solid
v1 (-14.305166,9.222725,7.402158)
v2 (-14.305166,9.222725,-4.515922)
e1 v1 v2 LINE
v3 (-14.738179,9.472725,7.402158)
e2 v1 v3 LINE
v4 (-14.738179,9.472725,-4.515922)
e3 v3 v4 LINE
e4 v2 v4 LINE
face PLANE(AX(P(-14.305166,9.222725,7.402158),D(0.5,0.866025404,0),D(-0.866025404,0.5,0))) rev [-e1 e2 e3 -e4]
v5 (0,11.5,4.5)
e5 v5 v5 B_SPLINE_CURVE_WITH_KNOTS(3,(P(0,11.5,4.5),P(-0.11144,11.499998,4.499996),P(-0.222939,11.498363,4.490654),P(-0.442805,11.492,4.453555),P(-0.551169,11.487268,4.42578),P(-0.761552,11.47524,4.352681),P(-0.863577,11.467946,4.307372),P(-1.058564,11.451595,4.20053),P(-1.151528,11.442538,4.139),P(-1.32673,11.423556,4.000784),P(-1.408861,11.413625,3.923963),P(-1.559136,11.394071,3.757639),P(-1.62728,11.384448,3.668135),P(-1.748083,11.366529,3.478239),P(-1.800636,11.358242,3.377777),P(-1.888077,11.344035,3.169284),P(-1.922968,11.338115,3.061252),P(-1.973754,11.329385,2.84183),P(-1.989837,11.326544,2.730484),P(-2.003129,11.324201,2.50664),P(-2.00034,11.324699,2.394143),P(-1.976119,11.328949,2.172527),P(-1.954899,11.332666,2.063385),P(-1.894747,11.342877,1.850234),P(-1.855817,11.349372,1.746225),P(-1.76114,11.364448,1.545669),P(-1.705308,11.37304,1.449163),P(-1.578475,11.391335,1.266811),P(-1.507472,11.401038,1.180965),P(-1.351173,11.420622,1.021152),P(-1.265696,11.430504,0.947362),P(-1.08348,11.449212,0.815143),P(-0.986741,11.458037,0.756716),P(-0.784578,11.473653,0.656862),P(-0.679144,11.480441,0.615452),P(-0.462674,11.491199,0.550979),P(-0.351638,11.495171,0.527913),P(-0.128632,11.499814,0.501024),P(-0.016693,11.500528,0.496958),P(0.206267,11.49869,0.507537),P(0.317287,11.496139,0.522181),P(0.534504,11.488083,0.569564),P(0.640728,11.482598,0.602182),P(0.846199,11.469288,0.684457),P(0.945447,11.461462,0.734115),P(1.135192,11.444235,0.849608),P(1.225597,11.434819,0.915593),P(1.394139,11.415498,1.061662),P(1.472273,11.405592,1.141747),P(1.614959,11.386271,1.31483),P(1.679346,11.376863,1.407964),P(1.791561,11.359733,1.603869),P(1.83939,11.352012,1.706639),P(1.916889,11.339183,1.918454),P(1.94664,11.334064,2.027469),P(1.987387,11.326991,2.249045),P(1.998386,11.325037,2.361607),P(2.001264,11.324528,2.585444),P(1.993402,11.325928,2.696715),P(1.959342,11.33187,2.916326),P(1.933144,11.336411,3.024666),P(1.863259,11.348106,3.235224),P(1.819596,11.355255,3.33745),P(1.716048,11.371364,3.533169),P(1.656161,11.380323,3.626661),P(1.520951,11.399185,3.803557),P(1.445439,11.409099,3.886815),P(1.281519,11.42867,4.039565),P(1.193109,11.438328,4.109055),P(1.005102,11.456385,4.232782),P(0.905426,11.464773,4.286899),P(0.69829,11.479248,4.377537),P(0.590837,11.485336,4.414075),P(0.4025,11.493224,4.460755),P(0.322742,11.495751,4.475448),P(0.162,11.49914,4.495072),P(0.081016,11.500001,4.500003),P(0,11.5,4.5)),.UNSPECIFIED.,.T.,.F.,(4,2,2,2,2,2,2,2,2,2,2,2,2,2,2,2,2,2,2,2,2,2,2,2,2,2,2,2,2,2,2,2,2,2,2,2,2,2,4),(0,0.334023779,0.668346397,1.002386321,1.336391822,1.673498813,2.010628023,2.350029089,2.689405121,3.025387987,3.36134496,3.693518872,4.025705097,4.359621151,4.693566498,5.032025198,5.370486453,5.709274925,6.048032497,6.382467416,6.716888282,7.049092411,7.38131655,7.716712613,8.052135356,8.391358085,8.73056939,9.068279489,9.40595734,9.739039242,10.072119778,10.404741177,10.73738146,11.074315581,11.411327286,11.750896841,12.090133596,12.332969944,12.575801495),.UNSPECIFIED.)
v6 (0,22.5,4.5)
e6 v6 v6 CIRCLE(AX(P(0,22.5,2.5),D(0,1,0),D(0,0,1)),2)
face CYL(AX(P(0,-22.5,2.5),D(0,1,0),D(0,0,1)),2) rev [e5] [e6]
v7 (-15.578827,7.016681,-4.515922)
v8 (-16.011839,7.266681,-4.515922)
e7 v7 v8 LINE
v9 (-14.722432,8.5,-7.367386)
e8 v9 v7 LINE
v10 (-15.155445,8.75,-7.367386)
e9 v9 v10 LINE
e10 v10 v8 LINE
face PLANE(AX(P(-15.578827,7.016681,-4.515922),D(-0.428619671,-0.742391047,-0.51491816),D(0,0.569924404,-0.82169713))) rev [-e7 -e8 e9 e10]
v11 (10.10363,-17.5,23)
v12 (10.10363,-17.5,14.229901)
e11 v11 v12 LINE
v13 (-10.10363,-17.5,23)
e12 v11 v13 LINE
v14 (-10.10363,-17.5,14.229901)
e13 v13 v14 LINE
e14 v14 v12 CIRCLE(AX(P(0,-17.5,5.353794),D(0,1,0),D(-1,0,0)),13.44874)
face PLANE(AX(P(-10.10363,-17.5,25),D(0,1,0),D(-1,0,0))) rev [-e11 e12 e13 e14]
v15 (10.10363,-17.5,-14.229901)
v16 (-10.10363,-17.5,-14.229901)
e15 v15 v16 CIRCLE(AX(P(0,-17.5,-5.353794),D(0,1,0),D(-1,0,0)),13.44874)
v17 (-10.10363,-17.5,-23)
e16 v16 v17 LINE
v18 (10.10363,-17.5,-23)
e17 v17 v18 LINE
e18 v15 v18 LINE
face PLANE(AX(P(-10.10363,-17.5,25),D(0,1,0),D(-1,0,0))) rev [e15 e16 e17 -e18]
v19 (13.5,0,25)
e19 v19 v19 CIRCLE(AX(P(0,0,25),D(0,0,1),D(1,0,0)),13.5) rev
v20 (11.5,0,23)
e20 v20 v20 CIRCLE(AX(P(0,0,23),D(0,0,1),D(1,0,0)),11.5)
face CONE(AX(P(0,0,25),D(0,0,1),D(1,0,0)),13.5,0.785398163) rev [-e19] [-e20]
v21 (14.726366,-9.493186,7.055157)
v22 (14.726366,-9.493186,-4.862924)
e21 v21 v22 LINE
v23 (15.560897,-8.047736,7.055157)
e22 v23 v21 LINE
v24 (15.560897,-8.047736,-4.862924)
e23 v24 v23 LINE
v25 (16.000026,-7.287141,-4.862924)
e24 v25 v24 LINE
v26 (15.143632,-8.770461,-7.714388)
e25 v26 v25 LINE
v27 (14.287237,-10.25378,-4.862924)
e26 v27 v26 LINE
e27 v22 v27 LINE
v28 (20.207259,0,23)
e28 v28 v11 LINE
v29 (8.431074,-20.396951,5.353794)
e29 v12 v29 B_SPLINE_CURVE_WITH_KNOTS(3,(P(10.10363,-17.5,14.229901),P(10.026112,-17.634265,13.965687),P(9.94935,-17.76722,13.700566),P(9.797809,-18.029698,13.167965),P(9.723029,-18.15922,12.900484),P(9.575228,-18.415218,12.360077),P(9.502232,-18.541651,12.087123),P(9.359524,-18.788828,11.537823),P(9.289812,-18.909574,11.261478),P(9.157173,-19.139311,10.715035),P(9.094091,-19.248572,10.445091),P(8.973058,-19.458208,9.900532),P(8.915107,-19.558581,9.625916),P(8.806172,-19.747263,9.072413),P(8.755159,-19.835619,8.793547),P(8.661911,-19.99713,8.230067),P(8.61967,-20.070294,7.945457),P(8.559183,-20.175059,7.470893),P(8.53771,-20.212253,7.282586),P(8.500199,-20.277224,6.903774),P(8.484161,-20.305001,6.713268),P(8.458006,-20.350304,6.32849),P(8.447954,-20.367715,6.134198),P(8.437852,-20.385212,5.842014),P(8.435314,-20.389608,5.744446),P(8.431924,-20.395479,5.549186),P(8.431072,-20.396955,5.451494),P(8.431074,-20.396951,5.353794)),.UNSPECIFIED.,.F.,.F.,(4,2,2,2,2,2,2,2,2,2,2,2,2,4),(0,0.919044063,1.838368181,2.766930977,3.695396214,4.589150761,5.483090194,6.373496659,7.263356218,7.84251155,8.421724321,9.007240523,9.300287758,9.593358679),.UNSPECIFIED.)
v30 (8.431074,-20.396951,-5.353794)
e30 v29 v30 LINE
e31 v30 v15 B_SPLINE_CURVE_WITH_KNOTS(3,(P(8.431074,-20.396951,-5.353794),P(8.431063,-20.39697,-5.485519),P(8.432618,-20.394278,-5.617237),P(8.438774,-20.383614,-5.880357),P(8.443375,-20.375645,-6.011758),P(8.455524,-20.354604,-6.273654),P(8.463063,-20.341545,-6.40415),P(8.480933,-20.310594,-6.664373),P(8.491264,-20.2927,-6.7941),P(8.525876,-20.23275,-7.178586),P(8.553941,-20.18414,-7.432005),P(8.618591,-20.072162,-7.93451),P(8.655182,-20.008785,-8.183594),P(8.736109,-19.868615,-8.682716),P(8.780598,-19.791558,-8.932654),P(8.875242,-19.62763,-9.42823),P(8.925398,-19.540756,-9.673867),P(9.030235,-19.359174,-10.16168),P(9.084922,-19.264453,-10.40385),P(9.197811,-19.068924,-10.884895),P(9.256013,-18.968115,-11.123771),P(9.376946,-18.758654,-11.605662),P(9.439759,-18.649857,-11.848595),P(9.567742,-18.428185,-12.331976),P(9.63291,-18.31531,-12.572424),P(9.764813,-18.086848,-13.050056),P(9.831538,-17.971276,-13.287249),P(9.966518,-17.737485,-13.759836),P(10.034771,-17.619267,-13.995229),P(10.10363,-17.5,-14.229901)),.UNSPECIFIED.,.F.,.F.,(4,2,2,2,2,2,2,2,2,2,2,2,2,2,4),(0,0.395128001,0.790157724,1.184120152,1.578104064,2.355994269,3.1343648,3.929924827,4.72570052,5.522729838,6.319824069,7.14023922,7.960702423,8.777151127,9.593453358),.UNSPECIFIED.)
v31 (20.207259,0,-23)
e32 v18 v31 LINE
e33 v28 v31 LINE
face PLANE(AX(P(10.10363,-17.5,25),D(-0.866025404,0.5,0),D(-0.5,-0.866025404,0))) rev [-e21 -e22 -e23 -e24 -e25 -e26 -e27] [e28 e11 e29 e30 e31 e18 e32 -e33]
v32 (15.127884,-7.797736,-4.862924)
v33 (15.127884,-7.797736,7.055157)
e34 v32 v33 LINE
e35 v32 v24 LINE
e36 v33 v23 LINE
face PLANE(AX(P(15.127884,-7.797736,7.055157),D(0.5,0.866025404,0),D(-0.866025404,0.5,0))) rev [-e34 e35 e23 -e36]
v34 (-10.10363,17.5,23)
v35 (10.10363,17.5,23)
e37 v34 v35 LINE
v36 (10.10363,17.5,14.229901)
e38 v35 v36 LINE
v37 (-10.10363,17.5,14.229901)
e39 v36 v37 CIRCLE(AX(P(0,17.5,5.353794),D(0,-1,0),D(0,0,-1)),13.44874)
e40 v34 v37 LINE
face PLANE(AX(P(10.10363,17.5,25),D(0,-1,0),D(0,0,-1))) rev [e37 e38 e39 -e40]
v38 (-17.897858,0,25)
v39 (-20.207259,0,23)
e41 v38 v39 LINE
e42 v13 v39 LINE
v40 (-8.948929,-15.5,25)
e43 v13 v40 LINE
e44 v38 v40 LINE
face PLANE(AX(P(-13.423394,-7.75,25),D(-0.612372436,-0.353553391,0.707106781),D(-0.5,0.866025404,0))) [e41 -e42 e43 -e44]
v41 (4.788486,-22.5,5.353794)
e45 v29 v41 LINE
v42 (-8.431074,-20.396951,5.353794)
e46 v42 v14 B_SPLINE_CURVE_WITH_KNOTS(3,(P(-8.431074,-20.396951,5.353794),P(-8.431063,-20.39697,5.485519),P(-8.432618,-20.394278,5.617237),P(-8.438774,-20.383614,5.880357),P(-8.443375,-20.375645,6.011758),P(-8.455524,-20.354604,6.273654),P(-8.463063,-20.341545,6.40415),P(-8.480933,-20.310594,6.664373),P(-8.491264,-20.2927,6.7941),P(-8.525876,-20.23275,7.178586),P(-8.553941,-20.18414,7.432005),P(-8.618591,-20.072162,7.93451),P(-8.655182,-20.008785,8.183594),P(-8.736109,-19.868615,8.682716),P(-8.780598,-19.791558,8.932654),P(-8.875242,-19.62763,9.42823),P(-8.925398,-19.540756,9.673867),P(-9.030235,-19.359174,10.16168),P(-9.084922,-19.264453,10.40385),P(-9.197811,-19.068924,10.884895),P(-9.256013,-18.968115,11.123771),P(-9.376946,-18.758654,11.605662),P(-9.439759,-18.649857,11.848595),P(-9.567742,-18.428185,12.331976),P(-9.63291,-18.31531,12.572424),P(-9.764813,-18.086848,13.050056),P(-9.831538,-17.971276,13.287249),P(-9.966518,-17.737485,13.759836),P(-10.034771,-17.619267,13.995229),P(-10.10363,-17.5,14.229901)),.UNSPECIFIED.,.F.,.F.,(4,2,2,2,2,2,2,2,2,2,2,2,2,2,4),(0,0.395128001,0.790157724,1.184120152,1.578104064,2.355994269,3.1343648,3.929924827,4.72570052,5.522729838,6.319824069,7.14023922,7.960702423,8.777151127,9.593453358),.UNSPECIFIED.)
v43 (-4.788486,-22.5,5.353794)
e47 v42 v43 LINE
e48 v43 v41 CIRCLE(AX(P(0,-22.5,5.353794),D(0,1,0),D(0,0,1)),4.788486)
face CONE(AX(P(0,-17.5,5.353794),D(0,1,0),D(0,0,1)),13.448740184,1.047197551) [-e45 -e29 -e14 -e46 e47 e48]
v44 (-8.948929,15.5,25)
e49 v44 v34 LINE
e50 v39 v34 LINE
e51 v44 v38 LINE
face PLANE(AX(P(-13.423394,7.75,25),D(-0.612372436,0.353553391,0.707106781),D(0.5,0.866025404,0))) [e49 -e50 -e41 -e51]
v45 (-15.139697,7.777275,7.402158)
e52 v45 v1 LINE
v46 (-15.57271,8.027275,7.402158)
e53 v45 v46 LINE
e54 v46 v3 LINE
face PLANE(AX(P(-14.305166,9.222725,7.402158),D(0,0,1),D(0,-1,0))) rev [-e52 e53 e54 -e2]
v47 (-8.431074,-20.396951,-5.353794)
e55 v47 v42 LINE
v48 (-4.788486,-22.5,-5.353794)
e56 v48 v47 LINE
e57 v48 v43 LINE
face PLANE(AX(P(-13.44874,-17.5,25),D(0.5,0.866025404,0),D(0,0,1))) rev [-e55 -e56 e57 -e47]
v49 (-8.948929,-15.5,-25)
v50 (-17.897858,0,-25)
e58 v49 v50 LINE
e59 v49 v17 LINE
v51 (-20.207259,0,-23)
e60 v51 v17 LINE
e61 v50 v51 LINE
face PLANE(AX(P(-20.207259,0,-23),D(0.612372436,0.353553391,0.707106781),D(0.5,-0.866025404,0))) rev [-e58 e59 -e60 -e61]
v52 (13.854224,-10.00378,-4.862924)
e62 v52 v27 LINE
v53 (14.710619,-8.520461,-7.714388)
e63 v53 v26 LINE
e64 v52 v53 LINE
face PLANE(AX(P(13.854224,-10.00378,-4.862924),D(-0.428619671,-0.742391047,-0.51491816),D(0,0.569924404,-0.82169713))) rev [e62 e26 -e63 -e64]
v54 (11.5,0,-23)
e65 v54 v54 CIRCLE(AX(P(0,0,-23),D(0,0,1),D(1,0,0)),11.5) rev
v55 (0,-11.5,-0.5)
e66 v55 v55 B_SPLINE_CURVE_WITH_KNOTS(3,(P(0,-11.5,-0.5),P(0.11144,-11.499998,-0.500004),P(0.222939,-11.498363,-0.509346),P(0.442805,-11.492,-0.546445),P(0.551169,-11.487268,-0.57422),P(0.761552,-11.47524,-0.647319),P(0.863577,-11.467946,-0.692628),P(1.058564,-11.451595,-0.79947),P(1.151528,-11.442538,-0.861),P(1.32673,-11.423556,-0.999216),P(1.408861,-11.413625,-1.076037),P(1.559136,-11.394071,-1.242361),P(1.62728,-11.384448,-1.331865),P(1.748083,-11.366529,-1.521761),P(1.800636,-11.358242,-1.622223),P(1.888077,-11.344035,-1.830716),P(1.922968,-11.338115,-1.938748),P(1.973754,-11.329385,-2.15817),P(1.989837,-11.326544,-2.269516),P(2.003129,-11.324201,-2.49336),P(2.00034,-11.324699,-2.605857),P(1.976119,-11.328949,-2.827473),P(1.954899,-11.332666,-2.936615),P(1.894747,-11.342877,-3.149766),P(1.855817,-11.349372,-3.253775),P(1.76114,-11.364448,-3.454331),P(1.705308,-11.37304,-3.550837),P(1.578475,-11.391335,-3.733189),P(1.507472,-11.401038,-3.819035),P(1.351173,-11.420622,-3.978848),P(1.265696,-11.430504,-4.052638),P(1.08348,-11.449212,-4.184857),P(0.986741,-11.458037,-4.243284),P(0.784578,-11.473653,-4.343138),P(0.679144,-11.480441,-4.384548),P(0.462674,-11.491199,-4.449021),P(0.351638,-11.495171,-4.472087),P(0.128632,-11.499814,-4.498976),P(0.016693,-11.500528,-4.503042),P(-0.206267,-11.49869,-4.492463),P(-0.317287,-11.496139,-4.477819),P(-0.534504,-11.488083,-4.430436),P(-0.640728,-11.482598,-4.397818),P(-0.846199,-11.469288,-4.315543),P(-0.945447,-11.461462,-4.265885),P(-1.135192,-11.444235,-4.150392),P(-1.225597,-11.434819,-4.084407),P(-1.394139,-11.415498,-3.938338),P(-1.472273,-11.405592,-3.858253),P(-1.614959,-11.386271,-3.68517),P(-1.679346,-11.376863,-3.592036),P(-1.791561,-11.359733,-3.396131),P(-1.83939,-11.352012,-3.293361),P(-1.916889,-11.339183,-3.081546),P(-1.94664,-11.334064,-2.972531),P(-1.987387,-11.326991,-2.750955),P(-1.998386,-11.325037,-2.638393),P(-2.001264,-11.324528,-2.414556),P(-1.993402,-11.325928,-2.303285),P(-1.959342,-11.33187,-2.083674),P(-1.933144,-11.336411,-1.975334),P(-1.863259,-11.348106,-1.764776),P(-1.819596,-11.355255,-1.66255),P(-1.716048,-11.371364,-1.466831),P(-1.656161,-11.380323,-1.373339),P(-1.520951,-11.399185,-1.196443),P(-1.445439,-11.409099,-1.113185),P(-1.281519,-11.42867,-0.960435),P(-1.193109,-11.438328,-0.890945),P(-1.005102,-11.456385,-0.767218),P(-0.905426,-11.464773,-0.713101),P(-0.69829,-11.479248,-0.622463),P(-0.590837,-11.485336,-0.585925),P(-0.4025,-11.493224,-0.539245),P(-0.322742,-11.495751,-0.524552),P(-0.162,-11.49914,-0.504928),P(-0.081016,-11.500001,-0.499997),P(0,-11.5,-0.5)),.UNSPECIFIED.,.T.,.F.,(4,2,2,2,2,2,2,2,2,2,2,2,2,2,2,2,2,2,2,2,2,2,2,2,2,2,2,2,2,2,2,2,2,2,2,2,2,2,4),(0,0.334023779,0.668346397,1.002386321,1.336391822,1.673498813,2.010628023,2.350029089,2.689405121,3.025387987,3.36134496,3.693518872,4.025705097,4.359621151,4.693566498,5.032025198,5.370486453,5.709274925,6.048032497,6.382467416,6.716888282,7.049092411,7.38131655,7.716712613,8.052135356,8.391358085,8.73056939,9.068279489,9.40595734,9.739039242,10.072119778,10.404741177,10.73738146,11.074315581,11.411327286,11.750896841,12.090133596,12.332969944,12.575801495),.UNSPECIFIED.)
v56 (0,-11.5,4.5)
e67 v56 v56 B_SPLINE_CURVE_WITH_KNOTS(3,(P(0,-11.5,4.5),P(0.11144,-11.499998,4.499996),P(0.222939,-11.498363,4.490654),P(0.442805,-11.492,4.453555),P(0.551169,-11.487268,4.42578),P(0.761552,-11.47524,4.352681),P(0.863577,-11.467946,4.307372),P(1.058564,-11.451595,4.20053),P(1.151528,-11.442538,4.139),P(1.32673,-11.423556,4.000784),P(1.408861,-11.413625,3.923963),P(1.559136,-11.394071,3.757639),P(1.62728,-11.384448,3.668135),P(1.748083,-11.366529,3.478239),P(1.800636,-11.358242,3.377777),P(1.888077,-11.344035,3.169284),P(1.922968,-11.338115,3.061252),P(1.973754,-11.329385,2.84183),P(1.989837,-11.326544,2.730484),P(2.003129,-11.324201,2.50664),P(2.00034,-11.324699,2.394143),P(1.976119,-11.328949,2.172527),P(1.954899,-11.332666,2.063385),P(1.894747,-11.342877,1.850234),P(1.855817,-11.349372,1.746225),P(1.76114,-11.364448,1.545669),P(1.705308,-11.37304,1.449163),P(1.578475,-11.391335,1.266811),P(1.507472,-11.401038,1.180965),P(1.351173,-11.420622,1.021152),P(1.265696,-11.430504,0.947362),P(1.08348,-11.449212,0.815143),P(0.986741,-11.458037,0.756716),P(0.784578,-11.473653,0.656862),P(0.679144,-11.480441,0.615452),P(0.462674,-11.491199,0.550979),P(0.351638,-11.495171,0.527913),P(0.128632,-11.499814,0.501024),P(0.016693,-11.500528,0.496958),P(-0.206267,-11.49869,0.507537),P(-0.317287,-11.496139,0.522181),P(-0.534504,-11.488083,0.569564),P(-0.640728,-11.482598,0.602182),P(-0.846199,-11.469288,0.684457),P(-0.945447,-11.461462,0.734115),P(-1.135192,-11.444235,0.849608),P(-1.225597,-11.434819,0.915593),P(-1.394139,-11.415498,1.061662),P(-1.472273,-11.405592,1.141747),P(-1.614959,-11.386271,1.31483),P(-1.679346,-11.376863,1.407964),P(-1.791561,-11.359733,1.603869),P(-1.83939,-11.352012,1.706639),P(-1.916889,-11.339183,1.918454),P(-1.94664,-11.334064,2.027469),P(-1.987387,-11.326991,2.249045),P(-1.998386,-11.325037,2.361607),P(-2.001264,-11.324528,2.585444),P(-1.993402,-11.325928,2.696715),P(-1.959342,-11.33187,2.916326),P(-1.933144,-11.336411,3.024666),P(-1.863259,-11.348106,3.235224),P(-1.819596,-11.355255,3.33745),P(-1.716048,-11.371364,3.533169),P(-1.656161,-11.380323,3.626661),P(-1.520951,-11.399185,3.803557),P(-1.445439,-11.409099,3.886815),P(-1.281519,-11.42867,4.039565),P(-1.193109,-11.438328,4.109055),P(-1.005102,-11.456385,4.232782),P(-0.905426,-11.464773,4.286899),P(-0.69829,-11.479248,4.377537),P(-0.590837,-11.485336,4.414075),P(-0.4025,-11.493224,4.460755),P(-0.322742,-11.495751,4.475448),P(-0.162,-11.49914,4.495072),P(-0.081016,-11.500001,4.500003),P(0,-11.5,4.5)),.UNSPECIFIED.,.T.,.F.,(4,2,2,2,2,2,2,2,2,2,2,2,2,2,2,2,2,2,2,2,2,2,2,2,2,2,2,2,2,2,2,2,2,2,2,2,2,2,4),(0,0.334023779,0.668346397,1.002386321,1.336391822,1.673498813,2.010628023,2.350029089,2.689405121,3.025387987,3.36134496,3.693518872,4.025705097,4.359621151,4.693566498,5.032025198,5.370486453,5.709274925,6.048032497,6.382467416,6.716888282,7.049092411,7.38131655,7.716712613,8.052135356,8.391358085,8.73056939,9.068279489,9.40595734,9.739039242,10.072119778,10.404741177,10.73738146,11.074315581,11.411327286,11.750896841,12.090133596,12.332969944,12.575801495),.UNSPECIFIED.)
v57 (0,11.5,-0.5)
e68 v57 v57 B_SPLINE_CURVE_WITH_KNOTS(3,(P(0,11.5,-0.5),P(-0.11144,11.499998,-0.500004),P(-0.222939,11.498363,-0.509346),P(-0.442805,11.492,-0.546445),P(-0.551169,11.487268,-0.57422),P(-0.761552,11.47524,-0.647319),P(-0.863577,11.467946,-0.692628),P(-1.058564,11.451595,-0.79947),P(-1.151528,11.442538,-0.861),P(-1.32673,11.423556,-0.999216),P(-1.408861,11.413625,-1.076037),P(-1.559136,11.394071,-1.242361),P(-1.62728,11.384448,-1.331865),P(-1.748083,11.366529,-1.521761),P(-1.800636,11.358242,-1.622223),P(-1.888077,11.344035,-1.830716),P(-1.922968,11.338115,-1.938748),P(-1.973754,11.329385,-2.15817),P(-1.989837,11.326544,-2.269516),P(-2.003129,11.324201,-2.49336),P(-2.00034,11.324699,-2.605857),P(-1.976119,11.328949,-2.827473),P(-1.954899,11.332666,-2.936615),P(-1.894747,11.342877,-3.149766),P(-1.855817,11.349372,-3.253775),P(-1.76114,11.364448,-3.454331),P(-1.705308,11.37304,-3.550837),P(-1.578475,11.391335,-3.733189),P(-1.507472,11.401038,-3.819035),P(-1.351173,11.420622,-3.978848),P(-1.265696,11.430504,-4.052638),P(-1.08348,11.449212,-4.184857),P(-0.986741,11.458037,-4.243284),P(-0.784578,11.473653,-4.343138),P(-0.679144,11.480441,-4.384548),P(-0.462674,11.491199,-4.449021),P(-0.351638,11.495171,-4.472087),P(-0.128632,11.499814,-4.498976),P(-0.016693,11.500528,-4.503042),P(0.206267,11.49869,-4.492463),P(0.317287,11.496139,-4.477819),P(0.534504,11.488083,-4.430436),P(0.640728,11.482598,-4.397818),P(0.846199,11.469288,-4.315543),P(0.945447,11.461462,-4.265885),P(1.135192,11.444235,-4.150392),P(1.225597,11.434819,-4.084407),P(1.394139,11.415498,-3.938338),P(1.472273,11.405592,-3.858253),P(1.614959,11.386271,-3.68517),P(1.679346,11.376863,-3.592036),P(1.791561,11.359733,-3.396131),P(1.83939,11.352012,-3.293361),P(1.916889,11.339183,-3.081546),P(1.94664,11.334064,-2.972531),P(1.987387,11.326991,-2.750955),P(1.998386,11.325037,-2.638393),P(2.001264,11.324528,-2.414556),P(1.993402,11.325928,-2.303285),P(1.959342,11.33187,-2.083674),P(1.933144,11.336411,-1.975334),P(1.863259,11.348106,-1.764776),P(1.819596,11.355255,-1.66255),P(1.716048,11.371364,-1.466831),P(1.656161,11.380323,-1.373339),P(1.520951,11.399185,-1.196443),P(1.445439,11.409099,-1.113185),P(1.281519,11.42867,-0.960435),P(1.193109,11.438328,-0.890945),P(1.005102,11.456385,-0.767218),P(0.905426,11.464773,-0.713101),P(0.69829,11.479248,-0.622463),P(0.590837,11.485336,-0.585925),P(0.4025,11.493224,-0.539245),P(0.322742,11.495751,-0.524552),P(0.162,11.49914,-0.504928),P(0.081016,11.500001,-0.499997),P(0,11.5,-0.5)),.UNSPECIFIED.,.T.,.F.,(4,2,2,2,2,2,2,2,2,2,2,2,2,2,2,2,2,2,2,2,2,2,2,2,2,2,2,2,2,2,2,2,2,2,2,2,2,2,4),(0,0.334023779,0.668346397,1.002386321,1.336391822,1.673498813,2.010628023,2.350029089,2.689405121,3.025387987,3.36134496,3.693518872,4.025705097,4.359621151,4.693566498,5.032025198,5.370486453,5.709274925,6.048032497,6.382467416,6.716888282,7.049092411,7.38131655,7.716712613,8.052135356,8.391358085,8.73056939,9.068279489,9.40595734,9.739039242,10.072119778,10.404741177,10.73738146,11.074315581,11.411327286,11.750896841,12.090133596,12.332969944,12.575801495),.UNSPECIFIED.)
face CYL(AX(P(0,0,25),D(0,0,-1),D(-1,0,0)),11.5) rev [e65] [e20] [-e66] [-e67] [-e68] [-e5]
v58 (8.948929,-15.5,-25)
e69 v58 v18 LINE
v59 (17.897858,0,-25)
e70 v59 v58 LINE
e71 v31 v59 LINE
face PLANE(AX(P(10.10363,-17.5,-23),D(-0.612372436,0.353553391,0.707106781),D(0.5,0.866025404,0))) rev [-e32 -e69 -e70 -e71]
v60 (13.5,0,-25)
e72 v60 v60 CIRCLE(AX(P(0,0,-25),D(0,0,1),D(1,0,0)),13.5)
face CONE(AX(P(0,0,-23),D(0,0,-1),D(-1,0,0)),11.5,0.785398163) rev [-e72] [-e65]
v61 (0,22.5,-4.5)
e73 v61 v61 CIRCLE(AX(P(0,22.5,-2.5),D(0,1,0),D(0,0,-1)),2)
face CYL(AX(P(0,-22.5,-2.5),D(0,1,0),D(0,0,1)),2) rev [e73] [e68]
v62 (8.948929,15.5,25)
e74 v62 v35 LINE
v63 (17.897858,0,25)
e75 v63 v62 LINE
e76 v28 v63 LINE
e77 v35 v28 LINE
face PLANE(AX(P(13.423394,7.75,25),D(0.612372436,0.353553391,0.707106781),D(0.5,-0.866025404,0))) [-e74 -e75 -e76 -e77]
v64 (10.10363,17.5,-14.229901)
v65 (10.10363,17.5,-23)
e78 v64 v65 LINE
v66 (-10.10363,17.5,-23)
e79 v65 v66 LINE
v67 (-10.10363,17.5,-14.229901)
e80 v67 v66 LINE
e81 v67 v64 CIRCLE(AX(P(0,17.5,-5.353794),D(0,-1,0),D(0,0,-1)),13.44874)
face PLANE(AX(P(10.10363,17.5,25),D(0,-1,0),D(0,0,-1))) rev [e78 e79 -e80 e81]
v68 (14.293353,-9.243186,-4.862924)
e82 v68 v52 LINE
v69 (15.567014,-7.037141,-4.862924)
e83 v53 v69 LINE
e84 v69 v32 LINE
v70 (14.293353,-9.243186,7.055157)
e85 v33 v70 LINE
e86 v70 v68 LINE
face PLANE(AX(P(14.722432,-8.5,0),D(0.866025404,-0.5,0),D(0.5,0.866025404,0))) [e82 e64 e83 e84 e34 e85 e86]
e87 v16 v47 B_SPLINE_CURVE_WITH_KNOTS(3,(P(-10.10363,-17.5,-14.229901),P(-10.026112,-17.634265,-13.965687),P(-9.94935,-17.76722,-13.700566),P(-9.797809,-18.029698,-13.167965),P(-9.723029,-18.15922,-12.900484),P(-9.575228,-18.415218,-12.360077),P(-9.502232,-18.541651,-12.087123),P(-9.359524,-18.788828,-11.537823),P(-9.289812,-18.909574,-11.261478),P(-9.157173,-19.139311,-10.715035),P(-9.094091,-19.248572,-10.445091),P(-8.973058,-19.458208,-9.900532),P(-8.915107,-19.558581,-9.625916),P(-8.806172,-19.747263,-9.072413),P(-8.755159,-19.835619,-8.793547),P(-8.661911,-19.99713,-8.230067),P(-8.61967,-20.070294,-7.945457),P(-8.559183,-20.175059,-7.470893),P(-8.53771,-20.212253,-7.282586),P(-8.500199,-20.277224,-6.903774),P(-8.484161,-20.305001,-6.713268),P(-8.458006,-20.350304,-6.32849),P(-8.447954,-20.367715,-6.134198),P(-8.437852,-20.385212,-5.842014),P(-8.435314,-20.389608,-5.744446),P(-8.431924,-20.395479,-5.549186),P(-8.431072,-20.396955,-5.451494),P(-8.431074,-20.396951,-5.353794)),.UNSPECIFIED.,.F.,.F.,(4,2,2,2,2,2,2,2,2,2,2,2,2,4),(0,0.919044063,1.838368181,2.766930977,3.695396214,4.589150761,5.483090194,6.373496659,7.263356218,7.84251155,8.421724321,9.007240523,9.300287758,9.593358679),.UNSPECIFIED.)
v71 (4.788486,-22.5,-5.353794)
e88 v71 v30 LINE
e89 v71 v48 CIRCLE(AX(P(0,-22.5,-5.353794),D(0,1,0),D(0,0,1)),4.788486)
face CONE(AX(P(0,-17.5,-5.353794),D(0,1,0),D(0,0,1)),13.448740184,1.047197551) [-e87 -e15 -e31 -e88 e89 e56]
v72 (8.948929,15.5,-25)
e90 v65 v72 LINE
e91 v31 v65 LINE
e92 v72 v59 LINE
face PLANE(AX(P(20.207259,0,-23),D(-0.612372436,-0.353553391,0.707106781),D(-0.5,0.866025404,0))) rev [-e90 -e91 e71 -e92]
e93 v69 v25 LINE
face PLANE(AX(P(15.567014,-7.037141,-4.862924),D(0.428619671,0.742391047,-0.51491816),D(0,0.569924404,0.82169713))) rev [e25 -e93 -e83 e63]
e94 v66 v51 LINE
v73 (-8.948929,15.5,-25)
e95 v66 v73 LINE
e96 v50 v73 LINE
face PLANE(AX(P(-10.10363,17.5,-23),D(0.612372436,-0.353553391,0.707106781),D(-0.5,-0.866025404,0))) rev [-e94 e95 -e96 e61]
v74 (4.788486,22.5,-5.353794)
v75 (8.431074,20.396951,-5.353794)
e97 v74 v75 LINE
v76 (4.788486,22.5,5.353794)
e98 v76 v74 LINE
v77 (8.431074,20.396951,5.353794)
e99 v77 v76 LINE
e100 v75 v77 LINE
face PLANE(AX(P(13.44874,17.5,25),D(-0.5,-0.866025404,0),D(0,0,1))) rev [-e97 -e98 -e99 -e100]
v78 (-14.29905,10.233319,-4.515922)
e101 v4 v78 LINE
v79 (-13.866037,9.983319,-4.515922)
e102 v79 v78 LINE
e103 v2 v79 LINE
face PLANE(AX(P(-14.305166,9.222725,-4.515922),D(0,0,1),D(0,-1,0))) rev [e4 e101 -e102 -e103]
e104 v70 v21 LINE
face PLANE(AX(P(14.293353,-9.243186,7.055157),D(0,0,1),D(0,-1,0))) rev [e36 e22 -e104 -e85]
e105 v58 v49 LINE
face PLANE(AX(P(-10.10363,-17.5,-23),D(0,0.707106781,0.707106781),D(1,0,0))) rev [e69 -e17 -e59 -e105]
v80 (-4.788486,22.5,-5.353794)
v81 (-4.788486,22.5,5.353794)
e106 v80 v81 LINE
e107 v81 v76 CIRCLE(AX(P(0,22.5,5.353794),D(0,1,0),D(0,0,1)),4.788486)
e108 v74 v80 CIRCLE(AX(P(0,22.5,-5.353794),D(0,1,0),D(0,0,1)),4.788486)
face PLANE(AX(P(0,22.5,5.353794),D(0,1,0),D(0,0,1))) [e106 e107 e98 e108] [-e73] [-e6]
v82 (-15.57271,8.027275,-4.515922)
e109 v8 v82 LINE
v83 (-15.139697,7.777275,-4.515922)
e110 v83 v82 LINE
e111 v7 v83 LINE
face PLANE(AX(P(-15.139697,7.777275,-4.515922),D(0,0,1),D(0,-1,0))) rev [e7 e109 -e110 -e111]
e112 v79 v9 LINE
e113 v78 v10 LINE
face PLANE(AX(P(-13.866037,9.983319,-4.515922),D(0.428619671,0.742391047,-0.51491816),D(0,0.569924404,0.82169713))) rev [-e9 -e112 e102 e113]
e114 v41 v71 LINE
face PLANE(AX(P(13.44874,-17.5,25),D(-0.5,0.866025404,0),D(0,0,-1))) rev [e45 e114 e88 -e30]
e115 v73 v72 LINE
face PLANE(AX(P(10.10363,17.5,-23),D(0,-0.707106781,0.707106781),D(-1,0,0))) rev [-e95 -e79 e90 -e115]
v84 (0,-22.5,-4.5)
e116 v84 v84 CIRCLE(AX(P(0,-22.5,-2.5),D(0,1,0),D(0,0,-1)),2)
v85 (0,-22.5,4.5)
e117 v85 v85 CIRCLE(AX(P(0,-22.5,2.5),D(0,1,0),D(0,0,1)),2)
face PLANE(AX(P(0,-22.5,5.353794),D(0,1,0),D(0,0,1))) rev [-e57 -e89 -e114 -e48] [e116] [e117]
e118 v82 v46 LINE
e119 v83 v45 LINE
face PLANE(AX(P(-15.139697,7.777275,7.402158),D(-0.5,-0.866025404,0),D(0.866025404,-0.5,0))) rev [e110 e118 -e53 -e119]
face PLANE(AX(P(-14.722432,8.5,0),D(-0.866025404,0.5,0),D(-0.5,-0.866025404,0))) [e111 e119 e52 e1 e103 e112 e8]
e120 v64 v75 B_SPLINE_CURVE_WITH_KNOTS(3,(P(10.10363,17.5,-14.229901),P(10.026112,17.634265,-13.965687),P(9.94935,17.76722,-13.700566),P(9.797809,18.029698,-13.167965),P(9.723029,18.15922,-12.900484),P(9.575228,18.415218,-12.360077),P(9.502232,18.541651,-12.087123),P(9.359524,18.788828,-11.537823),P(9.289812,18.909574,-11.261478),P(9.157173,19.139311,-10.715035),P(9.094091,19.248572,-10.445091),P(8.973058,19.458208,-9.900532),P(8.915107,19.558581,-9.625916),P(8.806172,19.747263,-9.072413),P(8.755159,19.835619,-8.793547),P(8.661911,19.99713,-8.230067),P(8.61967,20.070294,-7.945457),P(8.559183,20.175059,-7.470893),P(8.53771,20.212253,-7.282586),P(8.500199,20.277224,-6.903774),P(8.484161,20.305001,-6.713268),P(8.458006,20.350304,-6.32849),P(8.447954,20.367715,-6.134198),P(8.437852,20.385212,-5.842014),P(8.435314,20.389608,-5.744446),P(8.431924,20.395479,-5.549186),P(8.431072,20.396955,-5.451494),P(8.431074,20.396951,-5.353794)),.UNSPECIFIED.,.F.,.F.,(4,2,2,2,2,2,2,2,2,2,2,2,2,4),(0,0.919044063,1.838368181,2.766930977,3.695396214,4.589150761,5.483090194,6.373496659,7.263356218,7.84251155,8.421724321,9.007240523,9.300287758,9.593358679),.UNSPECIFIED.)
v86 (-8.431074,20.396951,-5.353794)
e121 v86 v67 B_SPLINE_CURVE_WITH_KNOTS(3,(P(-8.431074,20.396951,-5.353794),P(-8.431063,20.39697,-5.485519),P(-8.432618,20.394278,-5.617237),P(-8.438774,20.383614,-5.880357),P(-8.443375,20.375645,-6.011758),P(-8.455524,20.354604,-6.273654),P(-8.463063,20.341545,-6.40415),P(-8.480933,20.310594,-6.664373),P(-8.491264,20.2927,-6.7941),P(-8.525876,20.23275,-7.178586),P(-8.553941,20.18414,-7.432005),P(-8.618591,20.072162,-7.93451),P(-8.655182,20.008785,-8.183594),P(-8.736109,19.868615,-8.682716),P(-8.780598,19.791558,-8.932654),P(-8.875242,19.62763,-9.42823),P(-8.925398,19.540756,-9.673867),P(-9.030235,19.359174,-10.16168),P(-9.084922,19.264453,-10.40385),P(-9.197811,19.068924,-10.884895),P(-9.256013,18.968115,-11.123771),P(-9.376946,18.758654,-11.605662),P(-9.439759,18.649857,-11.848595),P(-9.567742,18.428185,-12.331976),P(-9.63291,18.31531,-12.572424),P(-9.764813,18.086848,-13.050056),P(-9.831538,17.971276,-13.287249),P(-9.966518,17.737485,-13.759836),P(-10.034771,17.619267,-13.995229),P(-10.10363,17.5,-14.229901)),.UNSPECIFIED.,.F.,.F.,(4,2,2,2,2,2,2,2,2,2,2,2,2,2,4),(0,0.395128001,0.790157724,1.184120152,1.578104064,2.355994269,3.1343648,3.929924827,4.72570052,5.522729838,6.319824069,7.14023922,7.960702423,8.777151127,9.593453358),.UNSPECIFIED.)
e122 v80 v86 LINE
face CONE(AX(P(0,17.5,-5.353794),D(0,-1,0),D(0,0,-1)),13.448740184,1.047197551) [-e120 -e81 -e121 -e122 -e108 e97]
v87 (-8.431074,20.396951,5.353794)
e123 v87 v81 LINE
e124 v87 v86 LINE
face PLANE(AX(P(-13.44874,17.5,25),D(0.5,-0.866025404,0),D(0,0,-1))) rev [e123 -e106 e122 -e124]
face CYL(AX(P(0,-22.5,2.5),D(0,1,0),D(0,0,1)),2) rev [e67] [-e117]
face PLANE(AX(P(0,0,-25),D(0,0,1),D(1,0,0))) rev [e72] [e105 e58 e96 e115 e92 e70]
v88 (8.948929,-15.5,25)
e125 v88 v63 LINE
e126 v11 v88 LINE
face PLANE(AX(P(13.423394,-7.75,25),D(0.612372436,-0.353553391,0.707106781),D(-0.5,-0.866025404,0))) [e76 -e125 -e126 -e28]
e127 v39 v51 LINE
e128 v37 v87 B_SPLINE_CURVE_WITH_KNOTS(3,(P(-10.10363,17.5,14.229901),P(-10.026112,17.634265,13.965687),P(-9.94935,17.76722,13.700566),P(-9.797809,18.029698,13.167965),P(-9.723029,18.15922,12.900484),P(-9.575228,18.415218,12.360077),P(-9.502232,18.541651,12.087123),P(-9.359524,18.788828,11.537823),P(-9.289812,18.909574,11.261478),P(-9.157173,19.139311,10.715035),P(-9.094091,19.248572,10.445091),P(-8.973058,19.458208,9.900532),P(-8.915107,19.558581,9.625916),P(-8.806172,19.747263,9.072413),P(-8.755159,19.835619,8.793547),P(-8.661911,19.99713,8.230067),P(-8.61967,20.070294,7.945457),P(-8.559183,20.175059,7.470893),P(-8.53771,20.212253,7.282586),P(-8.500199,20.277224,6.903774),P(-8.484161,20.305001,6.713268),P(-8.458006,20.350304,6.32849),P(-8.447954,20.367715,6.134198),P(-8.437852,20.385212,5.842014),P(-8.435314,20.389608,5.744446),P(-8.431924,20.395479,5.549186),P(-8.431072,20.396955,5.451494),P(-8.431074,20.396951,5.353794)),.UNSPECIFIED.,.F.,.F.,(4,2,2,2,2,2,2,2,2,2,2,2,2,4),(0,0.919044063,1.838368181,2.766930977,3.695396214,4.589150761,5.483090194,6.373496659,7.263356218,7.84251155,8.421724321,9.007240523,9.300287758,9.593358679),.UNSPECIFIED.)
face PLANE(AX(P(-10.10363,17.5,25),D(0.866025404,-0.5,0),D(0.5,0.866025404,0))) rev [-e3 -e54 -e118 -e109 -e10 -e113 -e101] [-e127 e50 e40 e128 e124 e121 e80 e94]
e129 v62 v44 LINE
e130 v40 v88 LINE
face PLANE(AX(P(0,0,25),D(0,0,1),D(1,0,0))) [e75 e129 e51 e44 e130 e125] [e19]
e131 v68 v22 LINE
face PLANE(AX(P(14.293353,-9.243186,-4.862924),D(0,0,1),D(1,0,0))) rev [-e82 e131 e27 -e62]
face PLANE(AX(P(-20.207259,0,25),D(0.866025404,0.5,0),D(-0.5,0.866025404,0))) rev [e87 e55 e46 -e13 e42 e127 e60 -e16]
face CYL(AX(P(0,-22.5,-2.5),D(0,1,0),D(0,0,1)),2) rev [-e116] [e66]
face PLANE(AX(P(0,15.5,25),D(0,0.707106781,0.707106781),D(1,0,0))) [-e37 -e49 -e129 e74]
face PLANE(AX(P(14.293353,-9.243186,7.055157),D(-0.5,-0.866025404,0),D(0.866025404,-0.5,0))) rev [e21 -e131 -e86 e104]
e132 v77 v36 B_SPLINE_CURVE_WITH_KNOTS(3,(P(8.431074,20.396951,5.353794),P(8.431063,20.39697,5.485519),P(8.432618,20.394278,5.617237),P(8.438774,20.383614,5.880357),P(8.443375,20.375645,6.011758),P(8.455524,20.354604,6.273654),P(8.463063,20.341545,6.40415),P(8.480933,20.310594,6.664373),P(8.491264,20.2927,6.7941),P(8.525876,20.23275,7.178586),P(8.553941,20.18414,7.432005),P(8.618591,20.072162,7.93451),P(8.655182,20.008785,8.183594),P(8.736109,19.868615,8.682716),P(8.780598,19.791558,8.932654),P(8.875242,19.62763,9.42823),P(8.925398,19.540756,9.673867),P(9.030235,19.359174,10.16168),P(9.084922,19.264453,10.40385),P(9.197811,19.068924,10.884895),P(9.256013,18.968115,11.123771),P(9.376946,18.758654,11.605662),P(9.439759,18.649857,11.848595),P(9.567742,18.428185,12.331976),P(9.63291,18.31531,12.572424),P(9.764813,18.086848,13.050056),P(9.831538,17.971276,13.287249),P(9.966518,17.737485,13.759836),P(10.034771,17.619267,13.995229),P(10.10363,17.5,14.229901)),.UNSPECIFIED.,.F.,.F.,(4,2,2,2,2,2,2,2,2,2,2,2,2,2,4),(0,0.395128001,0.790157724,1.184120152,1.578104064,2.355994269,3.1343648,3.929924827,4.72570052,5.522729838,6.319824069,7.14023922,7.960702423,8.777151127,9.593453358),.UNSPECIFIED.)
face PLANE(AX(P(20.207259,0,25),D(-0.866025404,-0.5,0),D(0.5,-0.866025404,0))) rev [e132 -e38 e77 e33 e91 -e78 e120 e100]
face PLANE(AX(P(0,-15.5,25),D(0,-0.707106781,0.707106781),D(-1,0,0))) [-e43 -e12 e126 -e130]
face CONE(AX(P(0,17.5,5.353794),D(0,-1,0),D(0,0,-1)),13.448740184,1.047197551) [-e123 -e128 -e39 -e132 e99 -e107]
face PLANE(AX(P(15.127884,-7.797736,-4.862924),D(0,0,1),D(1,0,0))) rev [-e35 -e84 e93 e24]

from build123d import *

# Parameters (mm, degrees)
BOSS_EXTRUDE1_DEPTH      = 25
BOSS_EXTRUDE2_DEPTH      = 5
BOSS_EXTRUDE2_DEPTH_BACK = 40
SKETCH6_R                = 2
CUT_EXTRUDE2_DEPTH       = 56.302200077
SKETCH7_R                = 11.5
CUT_EXTRUDE3_DEPTH       = 59.434436194
CHAMFER3_SIZE            = 2
CHAMFER4_SIZE            = 8.660254038
CHAMFER4_SIZE_2          = 5
CUT_EXTRUDE4_DEPTH       = 0.5
CUT_EXTRUDE5_DEPTH       = 0.5


with BuildPart() as part:
    # Sketch1 → Boss-Extrude1 (new, symmetric)
    with BuildSketch(Plane.XY):
        Polygon((10.103629711, 17.5), (-10.103629711, 17.5), (-20.207259422, 0), (-10.103629711, -17.5), (10.103629711, -17.5), (20.207259422, 0), align=None)
    extrude(amount=BOSS_EXTRUDE1_DEPTH, both=True)

    # Sketch2 → Boss-Extrude2 (add, two sides: drawn at the far end of the back side and taken through both)
    with BuildSketch(Plane(origin=(0, 17.5, 0), x_dir=(1, 0, 0), z_dir=(0, 1, 0)).offset(-BOSS_EXTRUDE2_DEPTH_BACK)):
        with BuildLine():
            Line((-4.788486146, -5.353793539), (-4.788486146, 5.353793539))
            ThreePointArc((-4.788486146, 5.353793539), (0, 10.142279685), (4.788486146, 5.353793539))
            Line((4.788486146, 5.353793539), (4.788486146, -5.353793539))
            ThreePointArc((4.788486146, -5.353793539), (0, -10.142279685), (-4.788486146, -5.353793539))
        make_face()
    extrude(amount=BOSS_EXTRUDE2_DEPTH + BOSS_EXTRUDE2_DEPTH_BACK)

    # Sketch6 → Cut-Extrude2 (cut, through all)
    with BuildSketch(Plane(origin=(0, 22.5, 0), x_dir=(1, 0, 0), z_dir=(0, 1, 0))):
        with Locations(Location((0, -2.5, 0), (0, 0, 270))):
            Circle(SKETCH6_R)
        with Locations(Location((0, 2.5, 0), (0, 0, 270))):
            Circle(SKETCH6_R)
    extrude(amount=-CUT_EXTRUDE2_DEPTH, mode=Mode.SUBTRACT)

    # Sketch7 → Cut-Extrude3 (cut, through all)
    with BuildSketch(Plane(origin=(0, 0, -25), x_dir=(-1, 0, 0), z_dir=(0, 0, -1))):
        Circle(SKETCH7_R)
    extrude(amount=-CUT_EXTRUDE3_DEPTH, mode=Mode.SUBTRACT)

    # Chamfer3
    chamfer3_edges = [part.edges().sort_by_distance(p)[0] for p in [
        (-15.155444566, 8.75, 25),
        (-15.155444566, -8.75, 25),
        (0, -17.5, 25),
        (15.155444566, -8.75, 25),
        (15.155444566, 8.75, 25),
        (11.5, 0, 25),
        (11.5, 0, -25),
        (15.155444566, -8.75, -25),
        (0, -17.5, -25),
        (-15.155444566, -8.75, -25),
        (0, 17.5, 25),
        (-15.155444566, 8.75, -25),
        (0, 17.5, -25),
        (15.155444566, 8.75, -25),
    ]]
    chamfer(chamfer3_edges, length=CHAMFER3_SIZE)

    # Chamfer4
    # the kernel refuses this chamfer: 8.660254038, 5 mm, written as the material it adds along each edge
    with BuildSketch(Plane(origin=(4.788486146, -17.5, -5.353793539), x_dir=(0.9998132206222078, 0.019326765612700893, 0), z_dir=(0, 0, 1))) as chamfer4_piece_1_section:
        Polygon((CHAMFER4_SIZE * 0.999813220604, -CHAMFER4_SIZE * 0.0193267656124), (-CHAMFER4_SIZE_2 * 0.0193267656127, -CHAMFER4_SIZE_2 * 0.999813220622), (0, 0), align=None)
    chamfer4_piece_1 = extrude(amount=10.707587077, mode=Mode.PRIVATE)
    chamfer4_piece_1 = split(chamfer4_piece_1, bisect_by=Plane(origin=(8.460633685, -20.345752593, 0), z_dir=(-0.8660254037844387, 0.4999999999999999, 0)), keep=Keep.TOP, mode=Mode.PRIVATE)
    chamfer4_piece_1 = split(chamfer4_piece_1, bisect_by=Plane(origin=(6.722843937, -22.5, 0), z_dir=(0, 1, 0)), keep=Keep.TOP, mode=Mode.PRIVATE)
    add(chamfer4_piece_1)
    with BuildSketch(Plane(origin=(0, -17.5, -5.353793539), x_dir=(-1, 0, 0), z_dir=(0, 0, 1))) as chamfer4_piece_2_section:
        Polygon((4.788486146 + CHAMFER4_SIZE, 0), (4.788486146, CHAMFER4_SIZE_2), (4.788486146, 0), align=None)
    chamfer4_piece_2 = revolve(axis=Axis((0, -17.5, -5.353793539), (0, -1, 0)), revolution_arc=180, mode=Mode.PRIVATE)
    chamfer4_piece_2 = split(chamfer4_piece_2, bisect_by=Plane(origin=(6.935994124, -22.986505777, -10.917233829), z_dir=(-0.8660254037844387, 0.4999999999999999, 0)), keep=Keep.TOP, mode=Mode.PRIVATE)
    chamfer4_piece_2 = split(chamfer4_piece_2, bisect_by=Plane(origin=(-6.935994098, -22.986505822, -10.917233829), z_dir=(0.8660254037844385, 0.5000000000000003, 0)), keep=Keep.TOP, mode=Mode.PRIVATE)
    chamfer4_piece_2 = split(chamfer4_piece_2, bisect_by=Plane(origin=(5.2e-08, -22.5, -10.917233829), z_dir=(0, 1, 0)), keep=Keep.TOP, mode=Mode.PRIVATE)
    add(chamfer4_piece_2)
    with BuildSketch(Plane(origin=(0, -17.5, 5.353793539), x_dir=(1, 0, 0), z_dir=(0, 0, -1))) as chamfer4_piece_3_section:
        Polygon((4.788486146 + CHAMFER4_SIZE, 0), (4.788486146, CHAMFER4_SIZE_2), (4.788486146, 0), align=None)
    chamfer4_piece_3 = revolve(axis=Axis((0, -17.5, 5.353793539), (0, -1, 0)), revolution_arc=180, mode=Mode.PRIVATE)
    chamfer4_piece_3 = split(chamfer4_piece_3, bisect_by=Plane(origin=(6.935994128, -22.98650577, 10.917233836), z_dir=(-0.8660254037844387, 0.4999999999999999, 0)), keep=Keep.TOP, mode=Mode.PRIVATE)
    chamfer4_piece_3 = split(chamfer4_piece_3, bisect_by=Plane(origin=(-6.935994097, -22.986505824, 10.917233836), z_dir=(0.8660254037844385, 0.5000000000000003, 0)), keep=Keep.TOP, mode=Mode.PRIVATE)
    chamfer4_piece_3 = split(chamfer4_piece_3, bisect_by=Plane(origin=(6.2e-08, -22.5, 10.917233836), z_dir=(0, 1, 0)), keep=Keep.TOP, mode=Mode.PRIVATE)
    add(chamfer4_piece_3)
    with BuildSketch(Plane(origin=(-4.788486146, -17.5, 5.353793539), x_dir=(-0.999813220622208, 0.019326765612700497, 0), z_dir=(0, 0, -1))) as chamfer4_piece_4_section:
        Polygon((CHAMFER4_SIZE * 0.999813220604, -CHAMFER4_SIZE * 0.0193267656124), (-CHAMFER4_SIZE_2 * 0.0193267656127, -CHAMFER4_SIZE_2 * 0.999813220622), (0, 0), align=None)
    chamfer4_piece_4 = extrude(amount=10.707587077, mode=Mode.PRIVATE)
    chamfer4_piece_4 = split(chamfer4_piece_4, bisect_by=Plane(origin=(-8.460633685, -20.345752593, 0), z_dir=(0.8660254037844385, 0.5000000000000003, 0)), keep=Keep.TOP, mode=Mode.PRIVATE)
    chamfer4_piece_4 = split(chamfer4_piece_4, bisect_by=Plane(origin=(-6.722843937, -22.5, 0), z_dir=(0, 1, 0)), keep=Keep.TOP, mode=Mode.PRIVATE)
    add(chamfer4_piece_4)
    with BuildSketch(Plane(origin=(-4.788486146, 17.5, -5.353793539), x_dir=(-0.999813220622208, -0.019326765612700497, 0), z_dir=(0, 0, 1))) as chamfer4_piece_5_section:
        Polygon((CHAMFER4_SIZE * 0.999813220604, -CHAMFER4_SIZE * 0.0193267656124), (-CHAMFER4_SIZE_2 * 0.0193267656127, -CHAMFER4_SIZE_2 * 0.999813220622), (0, 0), align=None)
    chamfer4_piece_5 = extrude(amount=10.707587077, mode=Mode.PRIVATE)
    chamfer4_piece_5 = split(chamfer4_piece_5, bisect_by=Plane(origin=(-8.460633685, 20.345752593, 0), z_dir=(0.8660254037844388, -0.49999999999999983, 0)), keep=Keep.TOP, mode=Mode.PRIVATE)
    chamfer4_piece_5 = split(chamfer4_piece_5, bisect_by=Plane(origin=(-6.722843937, 22.5, 0), z_dir=(0, -1, 0)), keep=Keep.TOP, mode=Mode.PRIVATE)
    add(chamfer4_piece_5)
    with BuildSketch(Plane(origin=(0, 17.5, 5.353793539), x_dir=(1, 0, 0), z_dir=(0, 0, -1))) as chamfer4_piece_6_section:
        Polygon((4.788486146 + CHAMFER4_SIZE, 0), (4.788486146, -CHAMFER4_SIZE_2), (4.788486146, 0), align=None)
    chamfer4_piece_6 = revolve(axis=Axis((0, 17.5, 5.353793539), (0, -1, 0)), revolution_arc=180, mode=Mode.PRIVATE)
    chamfer4_piece_6 = split(chamfer4_piece_6, bisect_by=Plane(origin=(6.935994103, 22.986505812, 10.917233841), z_dir=(-0.8660254037844387, -0.5000000000000003, 0)), keep=Keep.TOP, mode=Mode.PRIVATE)
    chamfer4_piece_6 = split(chamfer4_piece_6, bisect_by=Plane(origin=(-6.935994125, 22.986505774, 10.917233841), z_dir=(0.8660254037844388, -0.49999999999999983, 0)), keep=Keep.TOP, mode=Mode.PRIVATE)
    chamfer4_piece_6 = split(chamfer4_piece_6, bisect_by=Plane(origin=(-4.4e-08, 22.5, 10.917233841), z_dir=(0, -1, 0)), keep=Keep.TOP, mode=Mode.PRIVATE)
    add(chamfer4_piece_6)
    with BuildSketch(Plane(origin=(0, 17.5, -5.353793539), x_dir=(-1, 0, 0), z_dir=(0, 0, 1))) as chamfer4_piece_7_section:
        Polygon((4.788486146 + CHAMFER4_SIZE, 0), (4.788486146, -CHAMFER4_SIZE_2), (4.788486146, 0), align=None)
    chamfer4_piece_7 = revolve(axis=Axis((0, 17.5, -5.353793539), (0, -1, 0)), revolution_arc=180, mode=Mode.PRIVATE)
    chamfer4_piece_7 = split(chamfer4_piece_7, bisect_by=Plane(origin=(6.935994097, 22.986505823, -10.917233827), z_dir=(-0.8660254037844387, -0.5000000000000003, 0)), keep=Keep.TOP, mode=Mode.PRIVATE)
    chamfer4_piece_7 = split(chamfer4_piece_7, bisect_by=Plane(origin=(-6.93599412, 22.986505784, -10.917233827), z_dir=(0.8660254037844388, -0.49999999999999983, 0)), keep=Keep.TOP, mode=Mode.PRIVATE)
    chamfer4_piece_7 = split(chamfer4_piece_7, bisect_by=Plane(origin=(-4.6e-08, 22.5, -10.917233827), z_dir=(0, -1, 0)), keep=Keep.TOP, mode=Mode.PRIVATE)
    add(chamfer4_piece_7)
    with BuildSketch(Plane(origin=(4.788486146, 17.5, 5.353793539), x_dir=(0.999813220622208, -0.019326765612700497, 0), z_dir=(0, 0, -1))) as chamfer4_piece_8_section:
        Polygon((CHAMFER4_SIZE * 0.999813220604, -CHAMFER4_SIZE * 0.0193267656124), (-CHAMFER4_SIZE_2 * 0.0193267656127, -CHAMFER4_SIZE_2 * 0.999813220622), (0, 0), align=None)
    chamfer4_piece_8 = extrude(amount=10.707587077, mode=Mode.PRIVATE)
    chamfer4_piece_8 = split(chamfer4_piece_8, bisect_by=Plane(origin=(8.460633685, 20.345752593, 0), z_dir=(-0.8660254037844387, -0.5000000000000003, 0)), keep=Keep.TOP, mode=Mode.PRIVATE)
    chamfer4_piece_8 = split(chamfer4_piece_8, bisect_by=Plane(origin=(6.722843937, 22.5, 0), z_dir=(0, -1, 0)), keep=Keep.TOP, mode=Mode.PRIVATE)
    add(chamfer4_piece_8)

    # Sketch8 → Cut-Extrude4 (cut)
    with BuildSketch(Plane(origin=(15.155444566, -8.75, 0), x_dir=(0, 0, -1), z_dir=(0.8660254037844387, -0.49999999999999983, 0))):
        Polygon((4.862923627, 0.810905121), (4.862923627, 1.689163545), (7.714387746, -0.02362609), (4.862923627, -1.736415726), (4.862923627, -0.858157301), (-7.055157189, -0.858157301), (-7.055157189, 0.810905121), align=None)
    extrude(amount=-CUT_EXTRUDE4_DEPTH, mode=Mode.SUBTRACT)

    # Sketch9 → Cut-Extrude5 (cut)
    with BuildSketch(Plane(origin=(-15.155444566, 8.75, 0), x_dir=(0, 0, 1), z_dir=(-0.8660254037844389, 0.49999999999999983, 0))):
        Polygon((-4.515922363, -0.834531211), (-4.515922363, -1.712789635), (-7.367386481, 0), (-4.515922363, 1.712789635), (-4.515922363, 0.834531211), (7.402158453, 0.834531211), (7.402158453, -0.834531211), align=None)
    extrude(amount=-CUT_EXTRUDE5_DEPTH, mode=Mode.SUBTRACT)


solid = part.part
